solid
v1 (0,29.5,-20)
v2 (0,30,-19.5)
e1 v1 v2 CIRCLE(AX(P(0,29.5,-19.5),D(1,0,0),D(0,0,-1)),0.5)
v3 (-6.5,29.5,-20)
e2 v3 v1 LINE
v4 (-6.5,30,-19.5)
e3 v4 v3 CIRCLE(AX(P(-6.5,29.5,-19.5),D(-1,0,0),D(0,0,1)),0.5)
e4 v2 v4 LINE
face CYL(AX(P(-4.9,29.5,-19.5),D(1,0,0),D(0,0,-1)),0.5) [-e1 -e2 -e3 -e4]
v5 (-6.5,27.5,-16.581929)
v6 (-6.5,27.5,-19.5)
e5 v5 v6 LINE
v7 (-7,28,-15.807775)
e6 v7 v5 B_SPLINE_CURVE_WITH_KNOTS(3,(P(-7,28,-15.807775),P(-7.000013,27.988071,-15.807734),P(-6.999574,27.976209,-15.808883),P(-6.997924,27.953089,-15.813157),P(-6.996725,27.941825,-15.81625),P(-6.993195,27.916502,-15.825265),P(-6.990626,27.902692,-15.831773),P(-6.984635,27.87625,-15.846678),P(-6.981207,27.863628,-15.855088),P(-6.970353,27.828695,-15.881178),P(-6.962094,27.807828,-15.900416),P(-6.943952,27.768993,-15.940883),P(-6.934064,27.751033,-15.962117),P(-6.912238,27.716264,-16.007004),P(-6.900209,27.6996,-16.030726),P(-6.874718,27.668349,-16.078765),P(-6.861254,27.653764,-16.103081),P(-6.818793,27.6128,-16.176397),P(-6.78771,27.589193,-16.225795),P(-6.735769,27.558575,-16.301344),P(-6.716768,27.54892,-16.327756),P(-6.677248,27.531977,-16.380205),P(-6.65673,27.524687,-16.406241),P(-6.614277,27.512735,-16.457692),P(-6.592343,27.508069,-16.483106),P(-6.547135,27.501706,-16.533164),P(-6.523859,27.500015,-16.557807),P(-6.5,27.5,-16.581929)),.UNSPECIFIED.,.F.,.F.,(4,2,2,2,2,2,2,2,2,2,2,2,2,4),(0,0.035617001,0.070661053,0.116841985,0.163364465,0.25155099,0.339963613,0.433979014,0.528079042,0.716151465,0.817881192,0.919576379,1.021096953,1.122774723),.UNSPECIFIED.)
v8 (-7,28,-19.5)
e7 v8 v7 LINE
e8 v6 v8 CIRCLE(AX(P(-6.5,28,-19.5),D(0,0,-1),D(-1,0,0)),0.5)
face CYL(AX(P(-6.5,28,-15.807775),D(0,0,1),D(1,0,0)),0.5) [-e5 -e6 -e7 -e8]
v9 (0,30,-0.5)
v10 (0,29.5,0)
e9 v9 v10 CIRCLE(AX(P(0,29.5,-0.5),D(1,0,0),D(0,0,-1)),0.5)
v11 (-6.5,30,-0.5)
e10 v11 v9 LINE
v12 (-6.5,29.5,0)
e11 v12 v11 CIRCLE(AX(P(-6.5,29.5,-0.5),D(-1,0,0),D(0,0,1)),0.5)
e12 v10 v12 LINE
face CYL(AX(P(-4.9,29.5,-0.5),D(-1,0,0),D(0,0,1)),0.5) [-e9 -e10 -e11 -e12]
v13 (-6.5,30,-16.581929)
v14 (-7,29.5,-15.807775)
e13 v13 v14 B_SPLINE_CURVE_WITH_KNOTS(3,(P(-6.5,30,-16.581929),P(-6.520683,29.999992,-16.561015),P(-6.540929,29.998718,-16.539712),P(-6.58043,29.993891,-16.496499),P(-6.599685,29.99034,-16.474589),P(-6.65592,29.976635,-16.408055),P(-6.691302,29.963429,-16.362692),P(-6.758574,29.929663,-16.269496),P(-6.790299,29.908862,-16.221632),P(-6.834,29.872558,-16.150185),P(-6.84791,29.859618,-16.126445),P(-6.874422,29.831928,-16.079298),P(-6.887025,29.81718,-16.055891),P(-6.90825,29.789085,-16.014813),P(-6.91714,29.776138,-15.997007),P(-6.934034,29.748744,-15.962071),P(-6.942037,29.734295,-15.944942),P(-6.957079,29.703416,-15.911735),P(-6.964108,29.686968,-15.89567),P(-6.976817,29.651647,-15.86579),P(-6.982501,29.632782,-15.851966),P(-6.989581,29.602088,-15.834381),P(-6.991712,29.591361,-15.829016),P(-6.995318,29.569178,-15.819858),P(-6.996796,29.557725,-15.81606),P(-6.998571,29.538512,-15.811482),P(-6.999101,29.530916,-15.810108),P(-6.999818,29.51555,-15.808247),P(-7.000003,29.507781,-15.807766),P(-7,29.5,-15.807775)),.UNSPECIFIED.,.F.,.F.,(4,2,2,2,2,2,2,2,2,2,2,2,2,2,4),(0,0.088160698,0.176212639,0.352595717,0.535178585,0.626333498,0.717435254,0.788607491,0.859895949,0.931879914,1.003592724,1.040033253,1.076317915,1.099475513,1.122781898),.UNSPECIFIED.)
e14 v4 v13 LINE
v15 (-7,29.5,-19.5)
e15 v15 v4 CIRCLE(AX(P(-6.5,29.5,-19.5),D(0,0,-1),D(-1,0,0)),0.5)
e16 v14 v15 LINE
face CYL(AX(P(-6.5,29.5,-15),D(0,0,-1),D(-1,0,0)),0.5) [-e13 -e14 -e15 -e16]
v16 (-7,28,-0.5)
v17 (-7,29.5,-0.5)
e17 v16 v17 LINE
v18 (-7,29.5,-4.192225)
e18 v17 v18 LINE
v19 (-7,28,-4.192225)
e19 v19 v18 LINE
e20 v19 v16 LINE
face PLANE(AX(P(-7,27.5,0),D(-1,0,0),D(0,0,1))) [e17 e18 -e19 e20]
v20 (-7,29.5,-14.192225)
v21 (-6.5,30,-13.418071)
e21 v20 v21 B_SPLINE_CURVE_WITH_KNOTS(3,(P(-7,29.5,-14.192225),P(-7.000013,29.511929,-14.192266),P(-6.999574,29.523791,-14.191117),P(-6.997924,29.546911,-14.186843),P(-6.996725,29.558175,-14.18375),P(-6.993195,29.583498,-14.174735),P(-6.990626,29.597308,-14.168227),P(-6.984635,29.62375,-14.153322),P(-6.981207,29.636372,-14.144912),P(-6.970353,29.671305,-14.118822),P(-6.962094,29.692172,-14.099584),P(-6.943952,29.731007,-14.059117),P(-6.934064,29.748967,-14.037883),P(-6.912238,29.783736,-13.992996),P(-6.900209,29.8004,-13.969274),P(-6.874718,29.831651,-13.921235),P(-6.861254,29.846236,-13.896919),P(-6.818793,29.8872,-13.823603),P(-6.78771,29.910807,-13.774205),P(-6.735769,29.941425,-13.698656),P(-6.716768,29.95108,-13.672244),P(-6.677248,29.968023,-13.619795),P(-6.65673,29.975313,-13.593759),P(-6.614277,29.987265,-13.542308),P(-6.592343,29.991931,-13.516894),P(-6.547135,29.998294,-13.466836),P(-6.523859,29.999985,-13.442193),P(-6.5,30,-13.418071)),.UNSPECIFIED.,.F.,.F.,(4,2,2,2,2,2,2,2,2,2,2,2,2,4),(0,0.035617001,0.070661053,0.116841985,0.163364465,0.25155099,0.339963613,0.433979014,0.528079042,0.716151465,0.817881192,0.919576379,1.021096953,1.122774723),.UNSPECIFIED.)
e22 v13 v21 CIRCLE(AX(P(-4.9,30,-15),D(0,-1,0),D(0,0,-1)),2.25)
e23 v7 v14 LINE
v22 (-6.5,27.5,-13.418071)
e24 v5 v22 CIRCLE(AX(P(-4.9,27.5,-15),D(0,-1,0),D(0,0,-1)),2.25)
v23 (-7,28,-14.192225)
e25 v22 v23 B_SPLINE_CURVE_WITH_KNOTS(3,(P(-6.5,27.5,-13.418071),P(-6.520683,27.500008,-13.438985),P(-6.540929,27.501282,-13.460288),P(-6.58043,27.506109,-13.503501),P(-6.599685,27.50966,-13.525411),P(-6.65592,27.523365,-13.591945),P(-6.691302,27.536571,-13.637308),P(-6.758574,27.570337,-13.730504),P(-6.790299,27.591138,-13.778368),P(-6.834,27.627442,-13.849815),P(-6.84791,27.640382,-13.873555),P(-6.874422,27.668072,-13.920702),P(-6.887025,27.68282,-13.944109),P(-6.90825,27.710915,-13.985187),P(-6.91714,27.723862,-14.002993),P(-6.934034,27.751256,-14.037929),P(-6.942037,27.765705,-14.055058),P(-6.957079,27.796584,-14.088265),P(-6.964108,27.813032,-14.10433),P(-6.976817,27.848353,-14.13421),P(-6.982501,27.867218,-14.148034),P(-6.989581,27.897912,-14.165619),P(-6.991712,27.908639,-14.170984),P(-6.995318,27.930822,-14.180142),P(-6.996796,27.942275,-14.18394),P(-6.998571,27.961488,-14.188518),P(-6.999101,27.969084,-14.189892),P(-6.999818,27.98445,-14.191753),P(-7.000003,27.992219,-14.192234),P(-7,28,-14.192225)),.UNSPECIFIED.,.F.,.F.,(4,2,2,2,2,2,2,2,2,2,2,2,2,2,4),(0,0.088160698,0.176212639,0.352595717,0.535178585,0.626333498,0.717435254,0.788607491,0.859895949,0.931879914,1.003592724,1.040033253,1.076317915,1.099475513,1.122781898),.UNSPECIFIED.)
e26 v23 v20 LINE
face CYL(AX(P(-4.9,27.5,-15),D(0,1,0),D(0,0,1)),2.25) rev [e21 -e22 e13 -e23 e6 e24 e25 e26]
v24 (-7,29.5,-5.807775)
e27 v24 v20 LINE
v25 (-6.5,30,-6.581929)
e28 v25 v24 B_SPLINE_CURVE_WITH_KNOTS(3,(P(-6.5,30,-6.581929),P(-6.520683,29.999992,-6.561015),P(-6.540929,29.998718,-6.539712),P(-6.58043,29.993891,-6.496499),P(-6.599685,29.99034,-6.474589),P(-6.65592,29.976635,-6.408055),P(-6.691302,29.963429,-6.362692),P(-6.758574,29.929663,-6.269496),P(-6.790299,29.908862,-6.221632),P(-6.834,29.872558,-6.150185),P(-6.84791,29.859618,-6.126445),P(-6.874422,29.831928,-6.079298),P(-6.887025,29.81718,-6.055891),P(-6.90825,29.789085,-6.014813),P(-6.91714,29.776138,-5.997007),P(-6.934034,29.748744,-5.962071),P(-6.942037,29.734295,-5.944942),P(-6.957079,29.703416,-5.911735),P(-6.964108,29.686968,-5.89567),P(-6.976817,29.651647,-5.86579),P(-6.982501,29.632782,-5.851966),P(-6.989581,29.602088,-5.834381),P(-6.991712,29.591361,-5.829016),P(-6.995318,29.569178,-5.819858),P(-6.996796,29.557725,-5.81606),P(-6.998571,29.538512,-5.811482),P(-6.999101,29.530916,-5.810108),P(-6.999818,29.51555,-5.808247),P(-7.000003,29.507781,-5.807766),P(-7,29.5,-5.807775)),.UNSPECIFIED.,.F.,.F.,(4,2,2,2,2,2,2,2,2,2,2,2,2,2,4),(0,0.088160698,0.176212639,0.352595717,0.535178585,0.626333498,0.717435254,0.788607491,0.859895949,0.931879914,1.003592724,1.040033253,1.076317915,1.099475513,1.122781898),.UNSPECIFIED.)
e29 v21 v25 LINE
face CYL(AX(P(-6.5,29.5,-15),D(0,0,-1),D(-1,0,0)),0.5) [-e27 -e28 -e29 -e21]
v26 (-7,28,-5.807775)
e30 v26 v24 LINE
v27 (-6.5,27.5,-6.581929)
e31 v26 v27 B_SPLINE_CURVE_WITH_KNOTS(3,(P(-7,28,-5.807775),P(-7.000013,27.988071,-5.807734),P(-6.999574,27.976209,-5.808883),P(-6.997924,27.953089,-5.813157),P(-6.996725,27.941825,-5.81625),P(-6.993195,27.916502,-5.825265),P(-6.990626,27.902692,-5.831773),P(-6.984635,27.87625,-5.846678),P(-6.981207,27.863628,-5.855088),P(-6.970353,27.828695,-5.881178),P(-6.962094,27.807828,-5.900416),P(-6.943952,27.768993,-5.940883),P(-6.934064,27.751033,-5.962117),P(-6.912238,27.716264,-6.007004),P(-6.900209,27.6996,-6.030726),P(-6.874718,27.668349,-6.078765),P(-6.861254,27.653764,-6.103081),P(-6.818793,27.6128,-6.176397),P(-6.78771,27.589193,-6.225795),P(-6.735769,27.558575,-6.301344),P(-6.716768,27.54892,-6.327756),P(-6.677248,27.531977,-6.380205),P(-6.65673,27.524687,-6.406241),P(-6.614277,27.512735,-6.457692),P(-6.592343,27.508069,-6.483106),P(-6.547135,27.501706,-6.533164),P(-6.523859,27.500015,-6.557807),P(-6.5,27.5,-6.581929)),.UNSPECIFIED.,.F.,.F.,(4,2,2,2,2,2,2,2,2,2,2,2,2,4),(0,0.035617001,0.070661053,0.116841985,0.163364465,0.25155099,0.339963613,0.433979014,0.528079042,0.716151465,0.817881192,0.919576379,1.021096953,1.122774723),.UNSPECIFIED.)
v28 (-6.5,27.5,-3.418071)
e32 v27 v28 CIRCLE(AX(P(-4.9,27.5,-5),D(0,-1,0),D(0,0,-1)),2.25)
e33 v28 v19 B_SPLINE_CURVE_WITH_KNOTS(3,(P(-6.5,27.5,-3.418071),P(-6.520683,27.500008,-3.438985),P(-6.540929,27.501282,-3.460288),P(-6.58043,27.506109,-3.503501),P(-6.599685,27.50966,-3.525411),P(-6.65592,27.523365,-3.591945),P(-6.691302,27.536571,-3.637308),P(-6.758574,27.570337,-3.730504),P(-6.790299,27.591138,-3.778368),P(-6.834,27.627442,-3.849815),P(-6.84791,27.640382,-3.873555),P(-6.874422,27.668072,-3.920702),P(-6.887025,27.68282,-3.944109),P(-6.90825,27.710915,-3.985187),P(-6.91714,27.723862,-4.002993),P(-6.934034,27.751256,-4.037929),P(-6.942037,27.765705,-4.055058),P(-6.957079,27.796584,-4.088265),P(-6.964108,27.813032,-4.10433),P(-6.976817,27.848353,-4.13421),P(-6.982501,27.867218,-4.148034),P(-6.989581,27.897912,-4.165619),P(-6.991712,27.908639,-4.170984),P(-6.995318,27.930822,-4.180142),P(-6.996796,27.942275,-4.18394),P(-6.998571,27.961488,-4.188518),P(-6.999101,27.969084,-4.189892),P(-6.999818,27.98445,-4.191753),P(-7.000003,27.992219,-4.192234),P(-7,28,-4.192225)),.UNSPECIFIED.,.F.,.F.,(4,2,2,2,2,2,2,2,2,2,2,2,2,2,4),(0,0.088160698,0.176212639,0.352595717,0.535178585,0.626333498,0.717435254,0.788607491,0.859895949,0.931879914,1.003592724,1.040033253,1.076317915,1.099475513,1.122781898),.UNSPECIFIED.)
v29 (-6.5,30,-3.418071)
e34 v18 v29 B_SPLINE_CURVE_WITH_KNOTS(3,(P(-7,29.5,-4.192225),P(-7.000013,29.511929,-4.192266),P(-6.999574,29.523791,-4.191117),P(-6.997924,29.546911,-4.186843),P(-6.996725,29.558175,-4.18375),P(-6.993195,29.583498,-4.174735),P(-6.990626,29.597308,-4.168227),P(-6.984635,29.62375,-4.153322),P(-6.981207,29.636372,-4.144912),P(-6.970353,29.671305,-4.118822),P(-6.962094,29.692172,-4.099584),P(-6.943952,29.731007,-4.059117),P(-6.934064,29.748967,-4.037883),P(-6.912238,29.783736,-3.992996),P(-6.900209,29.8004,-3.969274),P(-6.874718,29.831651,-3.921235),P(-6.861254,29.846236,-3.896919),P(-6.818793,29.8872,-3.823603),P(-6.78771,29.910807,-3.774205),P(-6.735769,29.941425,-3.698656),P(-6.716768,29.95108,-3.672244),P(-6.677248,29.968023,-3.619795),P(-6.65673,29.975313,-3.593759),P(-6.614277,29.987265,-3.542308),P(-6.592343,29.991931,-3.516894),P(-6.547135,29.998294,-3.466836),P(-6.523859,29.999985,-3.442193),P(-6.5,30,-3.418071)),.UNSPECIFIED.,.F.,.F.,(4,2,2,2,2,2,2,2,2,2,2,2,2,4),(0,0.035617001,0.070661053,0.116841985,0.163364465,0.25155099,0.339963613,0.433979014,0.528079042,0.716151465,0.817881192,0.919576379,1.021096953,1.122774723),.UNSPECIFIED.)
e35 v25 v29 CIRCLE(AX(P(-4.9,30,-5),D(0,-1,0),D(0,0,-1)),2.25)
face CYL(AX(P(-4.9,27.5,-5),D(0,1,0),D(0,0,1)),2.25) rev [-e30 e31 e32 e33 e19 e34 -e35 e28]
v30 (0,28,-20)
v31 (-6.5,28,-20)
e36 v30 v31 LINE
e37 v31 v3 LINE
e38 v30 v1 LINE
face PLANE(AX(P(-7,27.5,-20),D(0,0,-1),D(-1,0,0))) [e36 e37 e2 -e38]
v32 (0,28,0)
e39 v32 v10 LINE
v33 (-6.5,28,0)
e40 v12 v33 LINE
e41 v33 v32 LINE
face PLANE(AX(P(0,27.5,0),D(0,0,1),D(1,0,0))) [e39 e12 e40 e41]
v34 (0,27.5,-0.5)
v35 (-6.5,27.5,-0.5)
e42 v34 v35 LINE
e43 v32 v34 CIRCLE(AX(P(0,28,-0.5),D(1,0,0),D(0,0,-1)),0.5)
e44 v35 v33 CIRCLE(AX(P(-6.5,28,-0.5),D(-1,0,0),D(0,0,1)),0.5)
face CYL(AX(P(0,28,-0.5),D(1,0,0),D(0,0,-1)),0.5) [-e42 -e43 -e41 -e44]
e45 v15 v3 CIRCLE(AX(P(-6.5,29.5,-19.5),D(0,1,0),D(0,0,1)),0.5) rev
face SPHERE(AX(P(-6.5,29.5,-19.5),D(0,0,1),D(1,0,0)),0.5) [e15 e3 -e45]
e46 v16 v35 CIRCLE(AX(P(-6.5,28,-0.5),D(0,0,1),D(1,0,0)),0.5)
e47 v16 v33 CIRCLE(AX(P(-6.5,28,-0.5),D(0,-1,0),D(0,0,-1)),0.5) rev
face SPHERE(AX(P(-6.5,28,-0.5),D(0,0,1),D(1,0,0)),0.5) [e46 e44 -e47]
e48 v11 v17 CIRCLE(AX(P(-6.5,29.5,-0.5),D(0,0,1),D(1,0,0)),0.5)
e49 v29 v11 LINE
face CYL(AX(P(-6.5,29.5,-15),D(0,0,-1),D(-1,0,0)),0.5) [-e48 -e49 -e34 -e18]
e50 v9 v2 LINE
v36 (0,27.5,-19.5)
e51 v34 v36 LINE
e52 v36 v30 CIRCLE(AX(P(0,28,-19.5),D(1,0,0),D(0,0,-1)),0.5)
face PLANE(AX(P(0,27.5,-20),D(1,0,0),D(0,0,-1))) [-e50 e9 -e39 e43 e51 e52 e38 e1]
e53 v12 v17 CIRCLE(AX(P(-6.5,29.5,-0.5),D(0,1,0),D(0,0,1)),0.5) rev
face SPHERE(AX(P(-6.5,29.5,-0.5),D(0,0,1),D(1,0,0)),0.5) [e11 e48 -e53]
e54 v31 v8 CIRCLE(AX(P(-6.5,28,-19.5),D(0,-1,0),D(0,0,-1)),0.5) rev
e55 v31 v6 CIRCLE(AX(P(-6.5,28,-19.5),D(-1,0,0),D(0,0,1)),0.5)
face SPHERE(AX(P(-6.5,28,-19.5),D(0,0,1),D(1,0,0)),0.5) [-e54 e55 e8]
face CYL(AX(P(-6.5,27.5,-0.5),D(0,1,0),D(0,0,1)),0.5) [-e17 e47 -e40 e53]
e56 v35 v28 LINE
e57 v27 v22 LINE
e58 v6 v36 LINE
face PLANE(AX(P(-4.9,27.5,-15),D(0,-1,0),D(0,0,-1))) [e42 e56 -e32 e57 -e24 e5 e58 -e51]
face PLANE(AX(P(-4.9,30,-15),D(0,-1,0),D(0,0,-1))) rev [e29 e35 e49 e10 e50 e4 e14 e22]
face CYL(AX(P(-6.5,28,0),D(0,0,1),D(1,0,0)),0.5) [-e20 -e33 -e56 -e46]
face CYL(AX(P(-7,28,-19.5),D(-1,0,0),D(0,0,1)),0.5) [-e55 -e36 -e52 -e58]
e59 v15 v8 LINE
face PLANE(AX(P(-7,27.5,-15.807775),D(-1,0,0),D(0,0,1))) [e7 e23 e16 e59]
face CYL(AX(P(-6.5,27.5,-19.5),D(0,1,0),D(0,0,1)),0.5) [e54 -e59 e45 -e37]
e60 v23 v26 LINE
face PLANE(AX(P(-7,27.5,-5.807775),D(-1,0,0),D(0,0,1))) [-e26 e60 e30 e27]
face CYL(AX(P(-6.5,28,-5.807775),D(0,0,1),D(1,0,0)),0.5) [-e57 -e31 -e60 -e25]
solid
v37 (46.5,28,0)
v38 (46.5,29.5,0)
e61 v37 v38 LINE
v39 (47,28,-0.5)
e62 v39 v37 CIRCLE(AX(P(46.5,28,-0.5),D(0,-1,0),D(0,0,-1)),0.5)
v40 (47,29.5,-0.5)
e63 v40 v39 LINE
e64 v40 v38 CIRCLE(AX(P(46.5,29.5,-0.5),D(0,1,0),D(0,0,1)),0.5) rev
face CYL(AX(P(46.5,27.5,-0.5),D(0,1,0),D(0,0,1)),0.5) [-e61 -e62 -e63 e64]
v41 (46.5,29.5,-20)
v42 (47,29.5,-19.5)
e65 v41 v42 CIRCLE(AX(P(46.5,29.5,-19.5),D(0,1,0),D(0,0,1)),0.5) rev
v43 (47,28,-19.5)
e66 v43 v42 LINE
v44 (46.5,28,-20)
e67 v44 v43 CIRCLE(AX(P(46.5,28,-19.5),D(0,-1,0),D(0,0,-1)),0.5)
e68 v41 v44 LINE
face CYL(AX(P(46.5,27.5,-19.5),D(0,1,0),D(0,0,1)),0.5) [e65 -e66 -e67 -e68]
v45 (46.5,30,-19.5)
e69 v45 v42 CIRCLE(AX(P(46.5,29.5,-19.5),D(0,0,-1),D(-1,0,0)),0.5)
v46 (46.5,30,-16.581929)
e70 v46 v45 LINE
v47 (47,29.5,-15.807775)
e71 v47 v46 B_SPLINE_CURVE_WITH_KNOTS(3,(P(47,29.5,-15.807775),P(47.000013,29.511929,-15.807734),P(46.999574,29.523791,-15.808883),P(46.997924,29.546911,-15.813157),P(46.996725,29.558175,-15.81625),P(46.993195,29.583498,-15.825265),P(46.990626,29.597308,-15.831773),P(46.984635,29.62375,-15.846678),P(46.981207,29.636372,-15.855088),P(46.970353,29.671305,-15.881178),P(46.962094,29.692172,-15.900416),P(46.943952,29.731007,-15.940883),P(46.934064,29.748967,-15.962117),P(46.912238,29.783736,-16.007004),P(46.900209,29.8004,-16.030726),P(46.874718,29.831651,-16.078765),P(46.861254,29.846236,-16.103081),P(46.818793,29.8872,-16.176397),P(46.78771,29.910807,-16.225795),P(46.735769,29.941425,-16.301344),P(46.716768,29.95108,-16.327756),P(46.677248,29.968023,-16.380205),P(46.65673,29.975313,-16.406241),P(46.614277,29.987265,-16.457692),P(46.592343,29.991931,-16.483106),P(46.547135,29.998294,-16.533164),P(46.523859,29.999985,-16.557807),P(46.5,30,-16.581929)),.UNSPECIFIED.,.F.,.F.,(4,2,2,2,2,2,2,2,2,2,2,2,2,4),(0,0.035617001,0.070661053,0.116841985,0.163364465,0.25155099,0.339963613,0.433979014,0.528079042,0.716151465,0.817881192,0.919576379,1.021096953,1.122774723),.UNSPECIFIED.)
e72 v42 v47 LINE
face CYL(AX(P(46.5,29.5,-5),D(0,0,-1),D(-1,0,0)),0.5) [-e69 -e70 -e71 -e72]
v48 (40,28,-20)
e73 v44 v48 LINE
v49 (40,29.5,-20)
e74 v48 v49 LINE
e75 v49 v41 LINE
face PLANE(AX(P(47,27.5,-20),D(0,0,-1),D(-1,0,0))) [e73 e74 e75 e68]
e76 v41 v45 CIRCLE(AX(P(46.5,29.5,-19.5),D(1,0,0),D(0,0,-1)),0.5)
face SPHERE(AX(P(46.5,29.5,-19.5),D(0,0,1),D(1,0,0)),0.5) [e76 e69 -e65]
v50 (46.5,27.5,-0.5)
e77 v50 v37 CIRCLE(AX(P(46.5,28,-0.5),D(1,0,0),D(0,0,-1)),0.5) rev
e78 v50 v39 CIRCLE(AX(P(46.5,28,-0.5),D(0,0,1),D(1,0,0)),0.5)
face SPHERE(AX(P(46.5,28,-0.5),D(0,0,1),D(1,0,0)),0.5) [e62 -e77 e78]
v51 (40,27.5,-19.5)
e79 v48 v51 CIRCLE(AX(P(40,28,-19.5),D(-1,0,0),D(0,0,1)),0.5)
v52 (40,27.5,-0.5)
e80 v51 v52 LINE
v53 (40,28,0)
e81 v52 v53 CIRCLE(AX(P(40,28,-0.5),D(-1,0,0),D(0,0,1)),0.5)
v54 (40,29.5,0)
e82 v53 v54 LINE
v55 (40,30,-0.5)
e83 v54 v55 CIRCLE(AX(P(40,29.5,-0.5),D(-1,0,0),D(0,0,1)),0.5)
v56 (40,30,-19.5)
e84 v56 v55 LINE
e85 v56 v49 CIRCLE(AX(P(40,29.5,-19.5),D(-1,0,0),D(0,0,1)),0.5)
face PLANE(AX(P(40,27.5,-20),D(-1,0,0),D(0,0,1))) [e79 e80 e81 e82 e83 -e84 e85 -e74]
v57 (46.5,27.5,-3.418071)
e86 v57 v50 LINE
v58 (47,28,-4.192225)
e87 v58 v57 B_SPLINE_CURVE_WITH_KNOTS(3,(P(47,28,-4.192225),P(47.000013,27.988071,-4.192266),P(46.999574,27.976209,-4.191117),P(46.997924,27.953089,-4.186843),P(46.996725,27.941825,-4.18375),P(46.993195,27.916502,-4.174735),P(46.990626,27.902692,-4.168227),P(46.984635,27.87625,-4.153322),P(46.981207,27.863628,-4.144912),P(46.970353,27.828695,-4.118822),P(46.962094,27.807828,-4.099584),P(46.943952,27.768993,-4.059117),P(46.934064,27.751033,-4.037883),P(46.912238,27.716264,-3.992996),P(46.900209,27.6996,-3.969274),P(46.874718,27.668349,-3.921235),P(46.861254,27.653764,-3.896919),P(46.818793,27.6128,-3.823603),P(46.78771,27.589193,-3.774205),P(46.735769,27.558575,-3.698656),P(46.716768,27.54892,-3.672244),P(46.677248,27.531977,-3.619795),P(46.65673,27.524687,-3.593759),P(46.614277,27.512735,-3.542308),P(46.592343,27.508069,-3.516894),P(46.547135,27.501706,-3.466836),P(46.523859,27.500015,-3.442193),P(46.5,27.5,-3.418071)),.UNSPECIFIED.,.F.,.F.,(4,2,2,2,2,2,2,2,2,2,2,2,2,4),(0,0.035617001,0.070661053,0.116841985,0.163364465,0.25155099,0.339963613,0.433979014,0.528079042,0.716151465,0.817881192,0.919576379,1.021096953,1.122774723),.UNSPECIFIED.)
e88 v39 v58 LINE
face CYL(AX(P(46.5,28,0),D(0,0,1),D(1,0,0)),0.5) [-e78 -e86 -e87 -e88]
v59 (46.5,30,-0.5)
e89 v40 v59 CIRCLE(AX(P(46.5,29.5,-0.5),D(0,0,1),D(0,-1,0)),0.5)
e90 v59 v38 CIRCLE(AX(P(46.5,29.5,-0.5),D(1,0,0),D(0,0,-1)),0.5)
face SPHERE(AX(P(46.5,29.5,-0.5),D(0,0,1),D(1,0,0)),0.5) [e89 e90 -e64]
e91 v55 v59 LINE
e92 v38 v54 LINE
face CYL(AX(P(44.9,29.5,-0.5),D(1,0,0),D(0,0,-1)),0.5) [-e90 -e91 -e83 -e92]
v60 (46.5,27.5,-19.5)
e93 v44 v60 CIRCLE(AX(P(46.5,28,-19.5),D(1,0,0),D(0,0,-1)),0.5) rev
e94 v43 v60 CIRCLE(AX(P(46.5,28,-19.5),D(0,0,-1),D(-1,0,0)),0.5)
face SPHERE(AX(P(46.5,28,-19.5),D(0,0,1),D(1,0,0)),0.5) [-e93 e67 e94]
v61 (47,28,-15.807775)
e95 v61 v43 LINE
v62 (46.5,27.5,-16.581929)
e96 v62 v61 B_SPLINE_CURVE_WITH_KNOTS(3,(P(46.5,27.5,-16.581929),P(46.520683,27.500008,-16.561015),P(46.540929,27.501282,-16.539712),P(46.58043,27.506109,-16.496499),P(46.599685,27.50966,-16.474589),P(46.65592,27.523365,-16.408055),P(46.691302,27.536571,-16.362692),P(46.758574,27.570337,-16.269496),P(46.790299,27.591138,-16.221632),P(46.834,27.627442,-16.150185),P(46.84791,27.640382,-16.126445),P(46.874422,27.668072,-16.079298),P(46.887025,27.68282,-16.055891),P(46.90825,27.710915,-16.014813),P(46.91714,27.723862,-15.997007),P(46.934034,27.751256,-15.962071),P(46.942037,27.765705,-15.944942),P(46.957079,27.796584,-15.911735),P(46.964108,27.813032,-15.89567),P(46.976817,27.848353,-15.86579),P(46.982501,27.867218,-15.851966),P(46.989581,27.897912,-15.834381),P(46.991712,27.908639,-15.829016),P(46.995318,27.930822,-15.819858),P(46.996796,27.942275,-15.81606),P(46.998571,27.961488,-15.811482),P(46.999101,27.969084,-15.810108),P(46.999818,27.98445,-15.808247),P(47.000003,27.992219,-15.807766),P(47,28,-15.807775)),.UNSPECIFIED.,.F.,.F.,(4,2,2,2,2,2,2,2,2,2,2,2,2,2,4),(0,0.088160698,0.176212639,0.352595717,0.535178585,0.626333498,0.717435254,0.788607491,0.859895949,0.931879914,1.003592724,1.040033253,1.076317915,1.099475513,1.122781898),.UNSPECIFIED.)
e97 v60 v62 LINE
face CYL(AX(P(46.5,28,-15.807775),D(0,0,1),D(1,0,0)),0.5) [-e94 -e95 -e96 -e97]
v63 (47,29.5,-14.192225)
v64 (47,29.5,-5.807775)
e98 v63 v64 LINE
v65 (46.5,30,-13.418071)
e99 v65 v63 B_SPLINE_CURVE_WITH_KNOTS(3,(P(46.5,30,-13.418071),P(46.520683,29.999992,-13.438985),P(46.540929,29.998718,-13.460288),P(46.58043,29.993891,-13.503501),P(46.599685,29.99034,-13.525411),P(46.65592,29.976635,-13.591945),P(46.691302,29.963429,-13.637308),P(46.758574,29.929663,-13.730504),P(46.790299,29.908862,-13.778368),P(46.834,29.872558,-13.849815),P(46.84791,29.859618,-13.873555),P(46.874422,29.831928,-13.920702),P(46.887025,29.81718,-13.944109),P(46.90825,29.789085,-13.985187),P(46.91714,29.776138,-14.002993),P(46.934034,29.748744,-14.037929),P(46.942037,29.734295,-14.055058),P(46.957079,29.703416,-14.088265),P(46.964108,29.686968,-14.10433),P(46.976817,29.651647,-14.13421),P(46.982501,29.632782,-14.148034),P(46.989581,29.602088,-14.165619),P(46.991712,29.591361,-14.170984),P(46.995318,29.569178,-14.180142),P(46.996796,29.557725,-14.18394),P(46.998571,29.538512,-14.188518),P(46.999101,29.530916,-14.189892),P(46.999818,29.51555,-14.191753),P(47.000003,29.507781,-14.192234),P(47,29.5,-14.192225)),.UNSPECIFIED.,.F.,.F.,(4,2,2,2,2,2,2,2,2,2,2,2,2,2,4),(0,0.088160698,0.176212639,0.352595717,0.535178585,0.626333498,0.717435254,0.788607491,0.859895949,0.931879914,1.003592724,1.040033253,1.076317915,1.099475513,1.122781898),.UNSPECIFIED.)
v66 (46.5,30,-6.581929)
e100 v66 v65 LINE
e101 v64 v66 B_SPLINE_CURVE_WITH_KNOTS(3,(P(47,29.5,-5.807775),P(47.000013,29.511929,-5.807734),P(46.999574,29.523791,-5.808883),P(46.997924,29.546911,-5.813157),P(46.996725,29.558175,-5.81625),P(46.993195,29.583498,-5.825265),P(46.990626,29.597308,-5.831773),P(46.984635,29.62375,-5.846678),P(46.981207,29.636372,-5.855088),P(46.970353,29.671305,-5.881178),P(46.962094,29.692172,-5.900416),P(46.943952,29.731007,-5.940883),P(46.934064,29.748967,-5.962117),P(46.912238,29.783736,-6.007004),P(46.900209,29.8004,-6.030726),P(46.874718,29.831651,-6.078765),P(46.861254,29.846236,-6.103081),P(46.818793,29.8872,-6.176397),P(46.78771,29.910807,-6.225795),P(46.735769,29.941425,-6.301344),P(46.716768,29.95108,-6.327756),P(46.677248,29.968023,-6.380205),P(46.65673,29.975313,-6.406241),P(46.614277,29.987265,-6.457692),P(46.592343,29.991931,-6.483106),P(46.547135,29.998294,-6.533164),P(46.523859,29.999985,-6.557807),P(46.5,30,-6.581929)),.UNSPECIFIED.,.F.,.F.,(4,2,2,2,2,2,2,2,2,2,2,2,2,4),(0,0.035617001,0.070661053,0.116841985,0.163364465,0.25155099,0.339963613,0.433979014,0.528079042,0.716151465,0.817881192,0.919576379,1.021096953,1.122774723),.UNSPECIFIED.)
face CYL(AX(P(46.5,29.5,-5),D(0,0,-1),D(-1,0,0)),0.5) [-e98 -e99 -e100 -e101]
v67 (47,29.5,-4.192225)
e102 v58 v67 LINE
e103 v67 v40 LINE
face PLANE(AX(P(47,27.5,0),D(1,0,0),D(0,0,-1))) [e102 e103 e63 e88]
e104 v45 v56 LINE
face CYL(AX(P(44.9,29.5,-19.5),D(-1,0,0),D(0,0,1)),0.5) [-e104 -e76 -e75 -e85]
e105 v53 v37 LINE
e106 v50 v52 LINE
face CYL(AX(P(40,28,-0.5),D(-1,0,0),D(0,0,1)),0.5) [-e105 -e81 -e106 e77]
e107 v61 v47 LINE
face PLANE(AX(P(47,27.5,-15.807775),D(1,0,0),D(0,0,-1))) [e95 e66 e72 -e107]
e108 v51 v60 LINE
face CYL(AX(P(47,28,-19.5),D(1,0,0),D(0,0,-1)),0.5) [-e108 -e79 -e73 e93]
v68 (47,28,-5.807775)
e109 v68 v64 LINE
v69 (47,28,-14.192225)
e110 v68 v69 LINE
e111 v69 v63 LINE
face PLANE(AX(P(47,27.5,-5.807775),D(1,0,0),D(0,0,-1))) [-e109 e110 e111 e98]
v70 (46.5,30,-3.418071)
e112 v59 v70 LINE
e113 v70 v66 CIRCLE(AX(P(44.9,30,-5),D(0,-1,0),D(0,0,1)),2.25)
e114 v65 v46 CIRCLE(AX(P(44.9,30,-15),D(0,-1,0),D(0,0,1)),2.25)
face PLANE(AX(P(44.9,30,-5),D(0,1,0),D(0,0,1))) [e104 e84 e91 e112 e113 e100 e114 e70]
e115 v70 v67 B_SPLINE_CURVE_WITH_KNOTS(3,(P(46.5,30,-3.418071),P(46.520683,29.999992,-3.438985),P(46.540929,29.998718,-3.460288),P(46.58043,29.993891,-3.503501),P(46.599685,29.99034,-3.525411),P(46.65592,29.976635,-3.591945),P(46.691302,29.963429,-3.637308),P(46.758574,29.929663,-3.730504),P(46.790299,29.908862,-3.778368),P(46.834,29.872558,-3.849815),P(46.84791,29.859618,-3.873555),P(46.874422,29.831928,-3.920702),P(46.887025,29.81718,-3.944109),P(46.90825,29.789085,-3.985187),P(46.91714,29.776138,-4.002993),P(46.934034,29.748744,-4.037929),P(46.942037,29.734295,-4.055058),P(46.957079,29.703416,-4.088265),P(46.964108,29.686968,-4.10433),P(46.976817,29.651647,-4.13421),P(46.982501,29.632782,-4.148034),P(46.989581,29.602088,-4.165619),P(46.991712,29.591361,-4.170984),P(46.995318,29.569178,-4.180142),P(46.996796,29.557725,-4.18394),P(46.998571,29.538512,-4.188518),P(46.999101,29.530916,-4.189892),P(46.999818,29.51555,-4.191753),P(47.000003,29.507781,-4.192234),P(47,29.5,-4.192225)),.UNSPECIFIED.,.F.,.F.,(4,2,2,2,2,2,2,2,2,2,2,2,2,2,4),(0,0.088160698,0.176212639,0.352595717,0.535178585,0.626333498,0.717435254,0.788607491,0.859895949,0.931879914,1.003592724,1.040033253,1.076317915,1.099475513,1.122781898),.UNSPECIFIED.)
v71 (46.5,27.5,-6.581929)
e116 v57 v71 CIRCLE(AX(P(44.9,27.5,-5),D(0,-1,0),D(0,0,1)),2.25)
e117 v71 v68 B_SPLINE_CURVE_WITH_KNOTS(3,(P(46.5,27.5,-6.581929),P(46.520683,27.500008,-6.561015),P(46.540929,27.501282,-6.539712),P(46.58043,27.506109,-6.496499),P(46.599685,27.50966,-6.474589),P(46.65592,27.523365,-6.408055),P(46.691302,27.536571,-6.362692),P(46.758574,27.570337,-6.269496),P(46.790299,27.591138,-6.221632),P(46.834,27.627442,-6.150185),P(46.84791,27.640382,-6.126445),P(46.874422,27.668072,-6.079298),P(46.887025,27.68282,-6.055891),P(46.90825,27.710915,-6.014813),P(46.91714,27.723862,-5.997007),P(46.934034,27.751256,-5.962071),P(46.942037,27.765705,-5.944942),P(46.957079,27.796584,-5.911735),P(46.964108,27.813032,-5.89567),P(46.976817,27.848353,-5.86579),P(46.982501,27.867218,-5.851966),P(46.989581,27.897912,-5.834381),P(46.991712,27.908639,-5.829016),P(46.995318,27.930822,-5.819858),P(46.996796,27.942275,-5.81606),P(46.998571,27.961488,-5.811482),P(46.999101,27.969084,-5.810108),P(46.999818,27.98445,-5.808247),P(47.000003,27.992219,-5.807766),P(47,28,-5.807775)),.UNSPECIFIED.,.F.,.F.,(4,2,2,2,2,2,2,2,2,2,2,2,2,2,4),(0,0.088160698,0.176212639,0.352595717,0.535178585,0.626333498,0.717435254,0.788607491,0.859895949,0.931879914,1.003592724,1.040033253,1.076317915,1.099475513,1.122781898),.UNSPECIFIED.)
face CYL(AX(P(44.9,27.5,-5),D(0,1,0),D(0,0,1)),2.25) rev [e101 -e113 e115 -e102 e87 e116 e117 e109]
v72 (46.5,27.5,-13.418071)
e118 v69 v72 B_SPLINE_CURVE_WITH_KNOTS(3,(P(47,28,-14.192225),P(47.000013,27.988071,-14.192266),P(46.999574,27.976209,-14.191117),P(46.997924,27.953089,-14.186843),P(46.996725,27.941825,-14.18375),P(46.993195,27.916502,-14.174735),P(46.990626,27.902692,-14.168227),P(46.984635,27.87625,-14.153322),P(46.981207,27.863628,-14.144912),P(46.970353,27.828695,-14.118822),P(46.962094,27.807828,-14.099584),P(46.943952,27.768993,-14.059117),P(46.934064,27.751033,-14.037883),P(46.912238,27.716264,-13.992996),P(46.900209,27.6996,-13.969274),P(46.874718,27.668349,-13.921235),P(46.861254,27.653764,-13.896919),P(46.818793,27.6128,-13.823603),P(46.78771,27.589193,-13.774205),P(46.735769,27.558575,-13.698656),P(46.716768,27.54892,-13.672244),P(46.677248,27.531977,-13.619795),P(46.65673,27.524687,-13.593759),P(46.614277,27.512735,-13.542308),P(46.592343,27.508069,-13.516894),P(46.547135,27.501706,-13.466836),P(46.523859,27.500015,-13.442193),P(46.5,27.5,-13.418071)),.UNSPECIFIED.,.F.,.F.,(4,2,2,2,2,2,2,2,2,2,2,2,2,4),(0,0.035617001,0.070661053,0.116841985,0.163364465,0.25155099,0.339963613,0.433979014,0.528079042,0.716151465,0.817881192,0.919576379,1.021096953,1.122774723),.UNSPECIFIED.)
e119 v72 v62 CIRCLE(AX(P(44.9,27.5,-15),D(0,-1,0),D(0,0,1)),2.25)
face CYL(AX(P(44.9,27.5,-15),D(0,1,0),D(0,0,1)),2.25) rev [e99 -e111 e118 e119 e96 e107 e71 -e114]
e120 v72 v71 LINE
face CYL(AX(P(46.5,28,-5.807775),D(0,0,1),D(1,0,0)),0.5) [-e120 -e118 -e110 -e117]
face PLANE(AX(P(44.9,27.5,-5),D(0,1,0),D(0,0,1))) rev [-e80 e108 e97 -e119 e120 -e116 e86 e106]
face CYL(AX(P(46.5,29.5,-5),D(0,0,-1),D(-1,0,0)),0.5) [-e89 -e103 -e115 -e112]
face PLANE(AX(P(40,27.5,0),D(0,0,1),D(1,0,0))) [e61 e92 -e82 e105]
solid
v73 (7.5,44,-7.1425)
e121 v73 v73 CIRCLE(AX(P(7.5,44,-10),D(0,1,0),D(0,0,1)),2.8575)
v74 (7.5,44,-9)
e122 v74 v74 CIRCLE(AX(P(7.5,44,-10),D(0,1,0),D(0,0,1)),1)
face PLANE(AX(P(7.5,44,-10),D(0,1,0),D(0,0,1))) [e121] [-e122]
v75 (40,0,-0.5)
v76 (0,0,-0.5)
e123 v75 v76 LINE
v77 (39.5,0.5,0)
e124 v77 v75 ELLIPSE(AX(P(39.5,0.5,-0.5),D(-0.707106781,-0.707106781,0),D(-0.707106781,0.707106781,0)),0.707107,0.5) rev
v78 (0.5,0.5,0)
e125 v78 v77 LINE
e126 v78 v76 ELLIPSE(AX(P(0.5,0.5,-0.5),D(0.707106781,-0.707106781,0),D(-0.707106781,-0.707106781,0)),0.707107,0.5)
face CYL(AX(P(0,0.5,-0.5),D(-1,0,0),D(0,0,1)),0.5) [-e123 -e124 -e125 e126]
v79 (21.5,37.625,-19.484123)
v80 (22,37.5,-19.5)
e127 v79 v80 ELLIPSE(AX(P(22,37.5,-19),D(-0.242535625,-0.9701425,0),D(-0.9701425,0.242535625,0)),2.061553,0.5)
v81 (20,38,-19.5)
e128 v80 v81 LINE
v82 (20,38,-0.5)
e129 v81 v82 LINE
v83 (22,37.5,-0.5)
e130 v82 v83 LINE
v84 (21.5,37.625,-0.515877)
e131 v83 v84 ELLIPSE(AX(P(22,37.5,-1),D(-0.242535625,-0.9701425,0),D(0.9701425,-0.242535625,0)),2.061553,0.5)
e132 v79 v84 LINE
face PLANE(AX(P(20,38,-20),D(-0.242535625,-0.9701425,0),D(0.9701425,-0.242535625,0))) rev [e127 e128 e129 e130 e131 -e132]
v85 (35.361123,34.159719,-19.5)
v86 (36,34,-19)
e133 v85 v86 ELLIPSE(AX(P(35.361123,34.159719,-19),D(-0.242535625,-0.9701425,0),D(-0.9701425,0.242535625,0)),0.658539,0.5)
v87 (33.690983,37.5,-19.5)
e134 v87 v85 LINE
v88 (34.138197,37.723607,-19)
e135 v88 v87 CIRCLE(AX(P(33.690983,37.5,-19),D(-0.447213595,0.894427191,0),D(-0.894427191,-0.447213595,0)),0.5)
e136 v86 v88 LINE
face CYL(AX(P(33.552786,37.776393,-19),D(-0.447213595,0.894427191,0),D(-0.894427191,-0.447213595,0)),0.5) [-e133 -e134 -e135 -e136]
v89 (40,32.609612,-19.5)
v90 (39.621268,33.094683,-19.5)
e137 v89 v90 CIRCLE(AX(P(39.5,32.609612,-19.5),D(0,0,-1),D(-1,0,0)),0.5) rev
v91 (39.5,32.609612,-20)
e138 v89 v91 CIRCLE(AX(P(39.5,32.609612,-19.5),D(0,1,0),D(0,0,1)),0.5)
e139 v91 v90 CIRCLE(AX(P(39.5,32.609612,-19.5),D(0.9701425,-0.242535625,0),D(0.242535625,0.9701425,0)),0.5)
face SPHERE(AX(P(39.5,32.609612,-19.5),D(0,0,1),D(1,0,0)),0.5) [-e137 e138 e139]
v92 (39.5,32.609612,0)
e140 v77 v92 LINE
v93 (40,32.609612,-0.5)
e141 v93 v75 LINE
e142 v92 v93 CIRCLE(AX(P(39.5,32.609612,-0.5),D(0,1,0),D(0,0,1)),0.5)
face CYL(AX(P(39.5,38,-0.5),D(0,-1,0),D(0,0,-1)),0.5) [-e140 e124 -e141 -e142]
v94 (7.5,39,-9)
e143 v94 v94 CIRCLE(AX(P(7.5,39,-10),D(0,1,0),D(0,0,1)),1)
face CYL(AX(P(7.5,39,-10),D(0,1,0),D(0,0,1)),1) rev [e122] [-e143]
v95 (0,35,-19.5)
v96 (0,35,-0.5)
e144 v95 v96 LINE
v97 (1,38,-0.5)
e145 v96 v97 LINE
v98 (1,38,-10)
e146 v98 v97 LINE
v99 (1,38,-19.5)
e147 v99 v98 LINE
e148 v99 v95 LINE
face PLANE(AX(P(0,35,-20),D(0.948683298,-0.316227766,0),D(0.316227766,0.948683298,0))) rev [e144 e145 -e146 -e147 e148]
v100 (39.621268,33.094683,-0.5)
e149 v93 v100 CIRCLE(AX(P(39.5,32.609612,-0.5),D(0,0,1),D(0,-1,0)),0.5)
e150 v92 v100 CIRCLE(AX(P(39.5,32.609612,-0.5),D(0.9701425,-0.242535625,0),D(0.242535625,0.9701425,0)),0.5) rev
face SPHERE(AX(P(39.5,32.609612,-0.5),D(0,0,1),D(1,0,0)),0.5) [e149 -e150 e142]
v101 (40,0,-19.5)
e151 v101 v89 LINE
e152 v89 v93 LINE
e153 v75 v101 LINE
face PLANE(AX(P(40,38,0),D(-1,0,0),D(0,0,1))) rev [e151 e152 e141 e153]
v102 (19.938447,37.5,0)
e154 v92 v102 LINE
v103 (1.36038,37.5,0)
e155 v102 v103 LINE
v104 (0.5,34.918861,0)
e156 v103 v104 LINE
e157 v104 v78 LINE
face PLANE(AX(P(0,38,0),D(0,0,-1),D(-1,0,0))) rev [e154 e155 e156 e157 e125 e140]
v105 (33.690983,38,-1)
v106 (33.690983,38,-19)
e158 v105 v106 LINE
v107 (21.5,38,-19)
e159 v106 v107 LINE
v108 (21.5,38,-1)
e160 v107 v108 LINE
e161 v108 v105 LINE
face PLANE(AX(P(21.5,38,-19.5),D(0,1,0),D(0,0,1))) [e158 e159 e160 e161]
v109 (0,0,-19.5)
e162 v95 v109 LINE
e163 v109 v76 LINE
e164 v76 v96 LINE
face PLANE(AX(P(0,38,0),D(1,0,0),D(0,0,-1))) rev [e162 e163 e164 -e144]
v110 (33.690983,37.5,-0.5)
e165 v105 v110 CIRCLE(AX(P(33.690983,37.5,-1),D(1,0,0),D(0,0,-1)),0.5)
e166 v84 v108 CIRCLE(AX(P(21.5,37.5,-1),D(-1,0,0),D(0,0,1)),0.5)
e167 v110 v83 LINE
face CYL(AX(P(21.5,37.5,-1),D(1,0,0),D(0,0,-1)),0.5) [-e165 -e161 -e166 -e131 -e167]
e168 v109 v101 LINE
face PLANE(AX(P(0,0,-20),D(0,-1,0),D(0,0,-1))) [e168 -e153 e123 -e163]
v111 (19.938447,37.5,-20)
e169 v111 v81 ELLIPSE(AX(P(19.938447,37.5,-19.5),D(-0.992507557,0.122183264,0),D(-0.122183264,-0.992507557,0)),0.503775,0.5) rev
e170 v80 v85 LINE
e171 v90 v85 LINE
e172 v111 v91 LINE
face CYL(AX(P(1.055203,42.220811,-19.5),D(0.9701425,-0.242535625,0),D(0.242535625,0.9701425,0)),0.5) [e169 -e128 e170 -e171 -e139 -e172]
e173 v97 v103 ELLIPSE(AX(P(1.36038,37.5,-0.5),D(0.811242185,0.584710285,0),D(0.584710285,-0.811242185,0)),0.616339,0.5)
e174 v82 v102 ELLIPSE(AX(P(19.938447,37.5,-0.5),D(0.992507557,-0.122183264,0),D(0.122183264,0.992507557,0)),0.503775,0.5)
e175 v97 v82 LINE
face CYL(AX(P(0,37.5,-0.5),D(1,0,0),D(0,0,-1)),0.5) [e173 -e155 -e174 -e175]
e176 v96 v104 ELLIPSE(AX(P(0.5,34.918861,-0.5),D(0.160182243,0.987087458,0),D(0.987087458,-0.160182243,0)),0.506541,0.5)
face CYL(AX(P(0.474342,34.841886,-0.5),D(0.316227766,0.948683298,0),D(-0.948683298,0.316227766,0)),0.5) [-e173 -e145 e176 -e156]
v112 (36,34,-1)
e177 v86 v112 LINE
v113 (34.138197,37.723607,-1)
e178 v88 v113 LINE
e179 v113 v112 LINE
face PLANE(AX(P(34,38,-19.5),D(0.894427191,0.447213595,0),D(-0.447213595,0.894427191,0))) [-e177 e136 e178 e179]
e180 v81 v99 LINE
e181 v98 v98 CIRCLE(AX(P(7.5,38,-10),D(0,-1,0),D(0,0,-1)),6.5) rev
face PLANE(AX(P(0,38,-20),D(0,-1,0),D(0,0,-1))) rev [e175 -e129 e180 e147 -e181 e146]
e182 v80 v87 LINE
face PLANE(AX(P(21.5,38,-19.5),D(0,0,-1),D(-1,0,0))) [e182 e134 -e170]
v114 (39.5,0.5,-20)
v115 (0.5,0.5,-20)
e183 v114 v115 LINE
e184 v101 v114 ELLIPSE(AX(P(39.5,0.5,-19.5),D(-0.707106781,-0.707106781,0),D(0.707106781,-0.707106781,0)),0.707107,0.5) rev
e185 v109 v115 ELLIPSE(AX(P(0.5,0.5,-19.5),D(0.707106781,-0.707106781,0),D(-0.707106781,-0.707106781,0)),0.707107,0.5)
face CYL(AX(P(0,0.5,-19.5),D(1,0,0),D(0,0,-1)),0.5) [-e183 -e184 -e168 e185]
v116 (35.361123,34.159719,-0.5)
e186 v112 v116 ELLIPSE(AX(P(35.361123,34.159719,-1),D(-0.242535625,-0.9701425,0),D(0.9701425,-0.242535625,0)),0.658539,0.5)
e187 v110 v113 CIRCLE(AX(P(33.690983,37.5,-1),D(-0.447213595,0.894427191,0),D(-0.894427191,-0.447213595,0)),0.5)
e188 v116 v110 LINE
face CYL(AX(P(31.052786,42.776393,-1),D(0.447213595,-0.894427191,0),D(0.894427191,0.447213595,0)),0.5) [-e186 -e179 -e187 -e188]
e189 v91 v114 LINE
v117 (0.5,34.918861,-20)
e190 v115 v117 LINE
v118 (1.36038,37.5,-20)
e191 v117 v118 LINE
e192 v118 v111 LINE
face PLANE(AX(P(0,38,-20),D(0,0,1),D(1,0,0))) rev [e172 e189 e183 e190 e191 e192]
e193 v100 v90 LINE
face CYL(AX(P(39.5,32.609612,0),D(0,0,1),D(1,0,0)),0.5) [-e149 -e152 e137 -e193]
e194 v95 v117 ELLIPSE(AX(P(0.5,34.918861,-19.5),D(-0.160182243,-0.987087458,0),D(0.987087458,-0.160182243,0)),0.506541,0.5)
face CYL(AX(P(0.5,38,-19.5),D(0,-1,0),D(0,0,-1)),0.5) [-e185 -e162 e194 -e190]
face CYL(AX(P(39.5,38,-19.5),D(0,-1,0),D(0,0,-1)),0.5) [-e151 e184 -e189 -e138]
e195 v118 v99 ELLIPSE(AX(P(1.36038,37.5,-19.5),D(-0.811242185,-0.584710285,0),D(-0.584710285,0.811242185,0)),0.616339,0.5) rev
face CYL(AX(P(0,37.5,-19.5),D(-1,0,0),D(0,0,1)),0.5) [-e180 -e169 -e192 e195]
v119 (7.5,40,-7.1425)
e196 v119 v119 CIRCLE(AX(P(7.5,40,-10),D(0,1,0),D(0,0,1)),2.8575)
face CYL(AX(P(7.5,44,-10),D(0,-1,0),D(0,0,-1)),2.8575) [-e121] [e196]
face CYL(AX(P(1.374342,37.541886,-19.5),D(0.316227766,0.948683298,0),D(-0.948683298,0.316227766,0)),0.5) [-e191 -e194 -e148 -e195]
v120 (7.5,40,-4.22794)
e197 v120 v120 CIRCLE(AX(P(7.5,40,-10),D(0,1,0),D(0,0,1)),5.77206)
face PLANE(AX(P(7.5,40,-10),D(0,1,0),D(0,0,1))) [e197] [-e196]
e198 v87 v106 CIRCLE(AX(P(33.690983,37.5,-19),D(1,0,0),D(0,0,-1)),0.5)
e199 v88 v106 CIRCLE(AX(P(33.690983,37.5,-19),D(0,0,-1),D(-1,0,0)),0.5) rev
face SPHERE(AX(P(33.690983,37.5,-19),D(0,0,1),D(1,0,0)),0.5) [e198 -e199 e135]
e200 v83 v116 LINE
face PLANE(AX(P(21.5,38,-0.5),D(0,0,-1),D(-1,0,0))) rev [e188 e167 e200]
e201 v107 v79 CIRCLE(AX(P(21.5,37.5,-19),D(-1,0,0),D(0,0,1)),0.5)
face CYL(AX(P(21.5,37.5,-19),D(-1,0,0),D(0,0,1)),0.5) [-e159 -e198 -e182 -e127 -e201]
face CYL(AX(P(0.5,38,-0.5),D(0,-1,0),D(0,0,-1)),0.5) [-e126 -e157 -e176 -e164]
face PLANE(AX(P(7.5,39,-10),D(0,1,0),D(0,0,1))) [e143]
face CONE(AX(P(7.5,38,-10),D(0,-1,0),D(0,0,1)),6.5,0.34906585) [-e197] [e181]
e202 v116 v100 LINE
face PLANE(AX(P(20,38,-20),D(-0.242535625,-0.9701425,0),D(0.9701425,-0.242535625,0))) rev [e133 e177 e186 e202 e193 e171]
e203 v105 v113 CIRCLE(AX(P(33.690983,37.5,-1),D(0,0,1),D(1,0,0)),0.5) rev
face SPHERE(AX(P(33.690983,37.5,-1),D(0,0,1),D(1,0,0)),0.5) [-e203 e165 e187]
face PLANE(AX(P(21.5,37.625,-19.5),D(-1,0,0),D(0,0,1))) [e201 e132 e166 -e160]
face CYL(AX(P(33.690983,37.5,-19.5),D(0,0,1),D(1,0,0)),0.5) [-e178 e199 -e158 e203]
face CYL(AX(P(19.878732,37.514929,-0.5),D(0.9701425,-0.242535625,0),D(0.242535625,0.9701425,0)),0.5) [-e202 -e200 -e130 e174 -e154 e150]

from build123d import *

# Parameters (mm, degrees)
SKETCH2_W             = 40
SKETCH2_H             = 20
BOSS_EXTRUDE1_DEPTH   = 38
SKETCH3_R             = 6.5
BOSS_EXTRUDE2_DEPTH   = 2
BOSS_EXTRUDE2_TAPER   = 20
SKETCH4_R             = 2.8575
BOSS_EXTRUDE3_DEPTH   = 4
SKETCH5_R             = 1
CUT_EXTRUDE1_DEPTH    = 5
BOSS_EXTRUDE6_START   = -8
BOSS_EXTRUDE6_DEPTH   = 2.5
BOSS_EXTRUDE6_2_DEPTH = 2.5
CUT_EXTRUDE5_DEPTH    = 68.416615163
BOSS_EXTRUDE7_START   = -0.5
BOSS_EXTRUDE7_DEPTH   = 19
FILLET1_R             = 0.5
FILLET3_R             = 0.5
FILLET4_R             = 0.5


with BuildPart() as part:
    # Sketch2 → Boss-Extrude1 (new body)
    with BuildSketch(Plane(origin=(0, 0, 0), x_dir=(1, 0, 0), z_dir=(0, 1, 0))):
        with Locations((20, 10)):
            Rectangle(SKETCH2_W, SKETCH2_H)
    extrude(amount=BOSS_EXTRUDE1_DEPTH)

    # Sketch3 → Boss-Extrude2 (add)
    with BuildSketch(Plane(origin=(0, 38, 0), x_dir=(1, 0, 0), z_dir=(0, 1, 0))):
        with Locations((7.5, 10)):
            Circle(SKETCH3_R)
    extrude(amount=BOSS_EXTRUDE2_DEPTH, taper=BOSS_EXTRUDE2_TAPER)

    # Sketch4 → Boss-Extrude3 (add)
    with BuildSketch(Plane(origin=(0, 40, 0), x_dir=(1, 0, 0), z_dir=(0, 1, 0))):
        with Locations(Location((7.5, 10, 0), (0, 0, 270))):
            Circle(SKETCH4_R)
    extrude(amount=BOSS_EXTRUDE3_DEPTH)

    # Sketch5 → Cut-Extrude1 (cut)
    with BuildSketch(Plane(origin=(0, 44, 0), x_dir=(1, 0, 0), z_dir=(0, 1, 0))):
        with Locations(Location((7.5, 10, 0), (0, 0, 270))):
            Circle(SKETCH5_R)
    extrude(amount=-CUT_EXTRUDE1_DEPTH, mode=Mode.SUBTRACT)

    # Sketch8 → Cut-Extrude5 (cut, through all)
    with BuildSketch(Plane.XY):
        Polygon((20, 38), (40, 33), (40, 38), align=None)
        Polygon((0, 38), (0, 35), (1, 38), align=None)
    extrude(amount=-CUT_EXTRUDE5_DEPTH, mode=Mode.SUBTRACT)

    # Sketch9 → Boss-Extrude7 (add)
    with BuildSketch(Plane.XY.offset(BOSS_EXTRUDE7_START)):
        Polygon((21.5, 38), (34, 38), (36, 34), (21.5, 37.625), align=None)
    extrude(amount=-BOSS_EXTRUDE7_DEPTH)

    # Fillet1
    fillet1_edges = [part.edges().sort_by_distance(p)[0] for p in [
        (30, 35.5, 0),
        (40, 16.5, 0),
        (20, 0, 0),
        (0, 17.5, 0),
        (0.5, 36.5, 0),
        (10.5, 38, 0),
        (34, 38, -10),
        (40, 33, -10),
        (27.75, 38, -19.5),
        (35, 36, -19.5),
        (35, 36, -0.5),
        (27.75, 38, -0.5),
        (0.5, 36.5, -20),
        (20, 0, -20),
        (30, 35.5, -20),
        (10.5, 38, -20),
        (0, 17.5, -20),
        (40, 16.5, -20),
    ]]
    fillet(fillet1_edges, radius=FILLET1_R - 0.0001)  # a hair under: the kernel refuses the full size


with BuildPart() as body_2:
    # Sketch6 → Boss-Extrude6 (new body)
    with BuildSketch(Plane(origin=(0, 38, 0), x_dir=(1, 0, 0), z_dir=(0, 1, 0)).offset(BOSS_EXTRUDE6_START)):
        with BuildLine():
            Line((40, 0), (47, 0))
            Line((47, 0), (47, 4.192225279))
            ThreePointArc((47, 4.192225279), (42.65, 5), (47, 5.807774721))
            Line((47, 5.807774721), (47, 14.192225279))
            ThreePointArc((47, 14.192225279), (42.65, 15), (47, 15.807774721))
            Line((47, 15.807774721), (47, 20))
            Line((47, 20), (40, 20))
            Line((40, 20), (40, 0))
        make_face()
    extrude(amount=-BOSS_EXTRUDE6_DEPTH)

    # Fillet4
    fillet4_edges = [body_2.edges().sort_by_distance(p)[0] for p in [
        (47, 27.5, -2.096112639),
        (43.5, 30, 0),
        (47, 28.75, -20),
        (47, 28.75, 0),
        (47, 27.5, -10),
        (47, 27.5, -17.903887361),
        (43.5, 27.5, -20),
        (43.5, 27.5, 0),
        (43.5, 30, -20),
        (47, 30, -17.903887361),
        (47, 30, -10),
        (47, 30, -2.096112639),
    ]]
    fillet(fillet4_edges, radius=FILLET4_R)


with BuildPart() as body_3:
    # Sketch6 → Boss-Extrude6 2 (new body)
    with BuildSketch(Plane(origin=(0, 38, 0), x_dir=(1, 0, 0), z_dir=(0, 1, 0)).offset(BOSS_EXTRUDE6_START)):
        with BuildLine():
            Line((-7, 15.807774721), (-7, 20))
            Line((-7, 20), (0, 20))
            Line((0, 20), (0, 0))
            Line((0, 0), (-7, 0))
            Line((-7, 0), (-7, 4.192225279))
            ThreePointArc((-7, 4.192225279), (-2.65, 5), (-7, 5.807774721))
            Line((-7, 5.807774721), (-7, 14.192225279))
            ThreePointArc((-7, 14.192225279), (-2.65, 15), (-7, 15.807774721))
        make_face()
    extrude(amount=-BOSS_EXTRUDE6_2_DEPTH)

    # Fillet3
    fillet3_edges = [body_3.edges().sort_by_distance(p)[0] for p in [
        (-7, 30, -10),
        (-7, 27.5, -2.096112639),
        (-7, 28.75, -20),
        (-7, 28.75, 0),
        (-3.5, 27.5, 0),
        (-3.5, 27.5, -20),
        (-7, 27.5, -17.903887361),
        (-7, 27.5, -10),
        (-7, 30, -17.903887361),
        (-3.5, 30, -20),
        (-3.5, 30, 0),
        (-7, 30, -2.096112639),
    ]]
    fillet(fillet3_edges, radius=FILLET3_R)


solid = Compound([part.part, body_2.part, body_3.part])
